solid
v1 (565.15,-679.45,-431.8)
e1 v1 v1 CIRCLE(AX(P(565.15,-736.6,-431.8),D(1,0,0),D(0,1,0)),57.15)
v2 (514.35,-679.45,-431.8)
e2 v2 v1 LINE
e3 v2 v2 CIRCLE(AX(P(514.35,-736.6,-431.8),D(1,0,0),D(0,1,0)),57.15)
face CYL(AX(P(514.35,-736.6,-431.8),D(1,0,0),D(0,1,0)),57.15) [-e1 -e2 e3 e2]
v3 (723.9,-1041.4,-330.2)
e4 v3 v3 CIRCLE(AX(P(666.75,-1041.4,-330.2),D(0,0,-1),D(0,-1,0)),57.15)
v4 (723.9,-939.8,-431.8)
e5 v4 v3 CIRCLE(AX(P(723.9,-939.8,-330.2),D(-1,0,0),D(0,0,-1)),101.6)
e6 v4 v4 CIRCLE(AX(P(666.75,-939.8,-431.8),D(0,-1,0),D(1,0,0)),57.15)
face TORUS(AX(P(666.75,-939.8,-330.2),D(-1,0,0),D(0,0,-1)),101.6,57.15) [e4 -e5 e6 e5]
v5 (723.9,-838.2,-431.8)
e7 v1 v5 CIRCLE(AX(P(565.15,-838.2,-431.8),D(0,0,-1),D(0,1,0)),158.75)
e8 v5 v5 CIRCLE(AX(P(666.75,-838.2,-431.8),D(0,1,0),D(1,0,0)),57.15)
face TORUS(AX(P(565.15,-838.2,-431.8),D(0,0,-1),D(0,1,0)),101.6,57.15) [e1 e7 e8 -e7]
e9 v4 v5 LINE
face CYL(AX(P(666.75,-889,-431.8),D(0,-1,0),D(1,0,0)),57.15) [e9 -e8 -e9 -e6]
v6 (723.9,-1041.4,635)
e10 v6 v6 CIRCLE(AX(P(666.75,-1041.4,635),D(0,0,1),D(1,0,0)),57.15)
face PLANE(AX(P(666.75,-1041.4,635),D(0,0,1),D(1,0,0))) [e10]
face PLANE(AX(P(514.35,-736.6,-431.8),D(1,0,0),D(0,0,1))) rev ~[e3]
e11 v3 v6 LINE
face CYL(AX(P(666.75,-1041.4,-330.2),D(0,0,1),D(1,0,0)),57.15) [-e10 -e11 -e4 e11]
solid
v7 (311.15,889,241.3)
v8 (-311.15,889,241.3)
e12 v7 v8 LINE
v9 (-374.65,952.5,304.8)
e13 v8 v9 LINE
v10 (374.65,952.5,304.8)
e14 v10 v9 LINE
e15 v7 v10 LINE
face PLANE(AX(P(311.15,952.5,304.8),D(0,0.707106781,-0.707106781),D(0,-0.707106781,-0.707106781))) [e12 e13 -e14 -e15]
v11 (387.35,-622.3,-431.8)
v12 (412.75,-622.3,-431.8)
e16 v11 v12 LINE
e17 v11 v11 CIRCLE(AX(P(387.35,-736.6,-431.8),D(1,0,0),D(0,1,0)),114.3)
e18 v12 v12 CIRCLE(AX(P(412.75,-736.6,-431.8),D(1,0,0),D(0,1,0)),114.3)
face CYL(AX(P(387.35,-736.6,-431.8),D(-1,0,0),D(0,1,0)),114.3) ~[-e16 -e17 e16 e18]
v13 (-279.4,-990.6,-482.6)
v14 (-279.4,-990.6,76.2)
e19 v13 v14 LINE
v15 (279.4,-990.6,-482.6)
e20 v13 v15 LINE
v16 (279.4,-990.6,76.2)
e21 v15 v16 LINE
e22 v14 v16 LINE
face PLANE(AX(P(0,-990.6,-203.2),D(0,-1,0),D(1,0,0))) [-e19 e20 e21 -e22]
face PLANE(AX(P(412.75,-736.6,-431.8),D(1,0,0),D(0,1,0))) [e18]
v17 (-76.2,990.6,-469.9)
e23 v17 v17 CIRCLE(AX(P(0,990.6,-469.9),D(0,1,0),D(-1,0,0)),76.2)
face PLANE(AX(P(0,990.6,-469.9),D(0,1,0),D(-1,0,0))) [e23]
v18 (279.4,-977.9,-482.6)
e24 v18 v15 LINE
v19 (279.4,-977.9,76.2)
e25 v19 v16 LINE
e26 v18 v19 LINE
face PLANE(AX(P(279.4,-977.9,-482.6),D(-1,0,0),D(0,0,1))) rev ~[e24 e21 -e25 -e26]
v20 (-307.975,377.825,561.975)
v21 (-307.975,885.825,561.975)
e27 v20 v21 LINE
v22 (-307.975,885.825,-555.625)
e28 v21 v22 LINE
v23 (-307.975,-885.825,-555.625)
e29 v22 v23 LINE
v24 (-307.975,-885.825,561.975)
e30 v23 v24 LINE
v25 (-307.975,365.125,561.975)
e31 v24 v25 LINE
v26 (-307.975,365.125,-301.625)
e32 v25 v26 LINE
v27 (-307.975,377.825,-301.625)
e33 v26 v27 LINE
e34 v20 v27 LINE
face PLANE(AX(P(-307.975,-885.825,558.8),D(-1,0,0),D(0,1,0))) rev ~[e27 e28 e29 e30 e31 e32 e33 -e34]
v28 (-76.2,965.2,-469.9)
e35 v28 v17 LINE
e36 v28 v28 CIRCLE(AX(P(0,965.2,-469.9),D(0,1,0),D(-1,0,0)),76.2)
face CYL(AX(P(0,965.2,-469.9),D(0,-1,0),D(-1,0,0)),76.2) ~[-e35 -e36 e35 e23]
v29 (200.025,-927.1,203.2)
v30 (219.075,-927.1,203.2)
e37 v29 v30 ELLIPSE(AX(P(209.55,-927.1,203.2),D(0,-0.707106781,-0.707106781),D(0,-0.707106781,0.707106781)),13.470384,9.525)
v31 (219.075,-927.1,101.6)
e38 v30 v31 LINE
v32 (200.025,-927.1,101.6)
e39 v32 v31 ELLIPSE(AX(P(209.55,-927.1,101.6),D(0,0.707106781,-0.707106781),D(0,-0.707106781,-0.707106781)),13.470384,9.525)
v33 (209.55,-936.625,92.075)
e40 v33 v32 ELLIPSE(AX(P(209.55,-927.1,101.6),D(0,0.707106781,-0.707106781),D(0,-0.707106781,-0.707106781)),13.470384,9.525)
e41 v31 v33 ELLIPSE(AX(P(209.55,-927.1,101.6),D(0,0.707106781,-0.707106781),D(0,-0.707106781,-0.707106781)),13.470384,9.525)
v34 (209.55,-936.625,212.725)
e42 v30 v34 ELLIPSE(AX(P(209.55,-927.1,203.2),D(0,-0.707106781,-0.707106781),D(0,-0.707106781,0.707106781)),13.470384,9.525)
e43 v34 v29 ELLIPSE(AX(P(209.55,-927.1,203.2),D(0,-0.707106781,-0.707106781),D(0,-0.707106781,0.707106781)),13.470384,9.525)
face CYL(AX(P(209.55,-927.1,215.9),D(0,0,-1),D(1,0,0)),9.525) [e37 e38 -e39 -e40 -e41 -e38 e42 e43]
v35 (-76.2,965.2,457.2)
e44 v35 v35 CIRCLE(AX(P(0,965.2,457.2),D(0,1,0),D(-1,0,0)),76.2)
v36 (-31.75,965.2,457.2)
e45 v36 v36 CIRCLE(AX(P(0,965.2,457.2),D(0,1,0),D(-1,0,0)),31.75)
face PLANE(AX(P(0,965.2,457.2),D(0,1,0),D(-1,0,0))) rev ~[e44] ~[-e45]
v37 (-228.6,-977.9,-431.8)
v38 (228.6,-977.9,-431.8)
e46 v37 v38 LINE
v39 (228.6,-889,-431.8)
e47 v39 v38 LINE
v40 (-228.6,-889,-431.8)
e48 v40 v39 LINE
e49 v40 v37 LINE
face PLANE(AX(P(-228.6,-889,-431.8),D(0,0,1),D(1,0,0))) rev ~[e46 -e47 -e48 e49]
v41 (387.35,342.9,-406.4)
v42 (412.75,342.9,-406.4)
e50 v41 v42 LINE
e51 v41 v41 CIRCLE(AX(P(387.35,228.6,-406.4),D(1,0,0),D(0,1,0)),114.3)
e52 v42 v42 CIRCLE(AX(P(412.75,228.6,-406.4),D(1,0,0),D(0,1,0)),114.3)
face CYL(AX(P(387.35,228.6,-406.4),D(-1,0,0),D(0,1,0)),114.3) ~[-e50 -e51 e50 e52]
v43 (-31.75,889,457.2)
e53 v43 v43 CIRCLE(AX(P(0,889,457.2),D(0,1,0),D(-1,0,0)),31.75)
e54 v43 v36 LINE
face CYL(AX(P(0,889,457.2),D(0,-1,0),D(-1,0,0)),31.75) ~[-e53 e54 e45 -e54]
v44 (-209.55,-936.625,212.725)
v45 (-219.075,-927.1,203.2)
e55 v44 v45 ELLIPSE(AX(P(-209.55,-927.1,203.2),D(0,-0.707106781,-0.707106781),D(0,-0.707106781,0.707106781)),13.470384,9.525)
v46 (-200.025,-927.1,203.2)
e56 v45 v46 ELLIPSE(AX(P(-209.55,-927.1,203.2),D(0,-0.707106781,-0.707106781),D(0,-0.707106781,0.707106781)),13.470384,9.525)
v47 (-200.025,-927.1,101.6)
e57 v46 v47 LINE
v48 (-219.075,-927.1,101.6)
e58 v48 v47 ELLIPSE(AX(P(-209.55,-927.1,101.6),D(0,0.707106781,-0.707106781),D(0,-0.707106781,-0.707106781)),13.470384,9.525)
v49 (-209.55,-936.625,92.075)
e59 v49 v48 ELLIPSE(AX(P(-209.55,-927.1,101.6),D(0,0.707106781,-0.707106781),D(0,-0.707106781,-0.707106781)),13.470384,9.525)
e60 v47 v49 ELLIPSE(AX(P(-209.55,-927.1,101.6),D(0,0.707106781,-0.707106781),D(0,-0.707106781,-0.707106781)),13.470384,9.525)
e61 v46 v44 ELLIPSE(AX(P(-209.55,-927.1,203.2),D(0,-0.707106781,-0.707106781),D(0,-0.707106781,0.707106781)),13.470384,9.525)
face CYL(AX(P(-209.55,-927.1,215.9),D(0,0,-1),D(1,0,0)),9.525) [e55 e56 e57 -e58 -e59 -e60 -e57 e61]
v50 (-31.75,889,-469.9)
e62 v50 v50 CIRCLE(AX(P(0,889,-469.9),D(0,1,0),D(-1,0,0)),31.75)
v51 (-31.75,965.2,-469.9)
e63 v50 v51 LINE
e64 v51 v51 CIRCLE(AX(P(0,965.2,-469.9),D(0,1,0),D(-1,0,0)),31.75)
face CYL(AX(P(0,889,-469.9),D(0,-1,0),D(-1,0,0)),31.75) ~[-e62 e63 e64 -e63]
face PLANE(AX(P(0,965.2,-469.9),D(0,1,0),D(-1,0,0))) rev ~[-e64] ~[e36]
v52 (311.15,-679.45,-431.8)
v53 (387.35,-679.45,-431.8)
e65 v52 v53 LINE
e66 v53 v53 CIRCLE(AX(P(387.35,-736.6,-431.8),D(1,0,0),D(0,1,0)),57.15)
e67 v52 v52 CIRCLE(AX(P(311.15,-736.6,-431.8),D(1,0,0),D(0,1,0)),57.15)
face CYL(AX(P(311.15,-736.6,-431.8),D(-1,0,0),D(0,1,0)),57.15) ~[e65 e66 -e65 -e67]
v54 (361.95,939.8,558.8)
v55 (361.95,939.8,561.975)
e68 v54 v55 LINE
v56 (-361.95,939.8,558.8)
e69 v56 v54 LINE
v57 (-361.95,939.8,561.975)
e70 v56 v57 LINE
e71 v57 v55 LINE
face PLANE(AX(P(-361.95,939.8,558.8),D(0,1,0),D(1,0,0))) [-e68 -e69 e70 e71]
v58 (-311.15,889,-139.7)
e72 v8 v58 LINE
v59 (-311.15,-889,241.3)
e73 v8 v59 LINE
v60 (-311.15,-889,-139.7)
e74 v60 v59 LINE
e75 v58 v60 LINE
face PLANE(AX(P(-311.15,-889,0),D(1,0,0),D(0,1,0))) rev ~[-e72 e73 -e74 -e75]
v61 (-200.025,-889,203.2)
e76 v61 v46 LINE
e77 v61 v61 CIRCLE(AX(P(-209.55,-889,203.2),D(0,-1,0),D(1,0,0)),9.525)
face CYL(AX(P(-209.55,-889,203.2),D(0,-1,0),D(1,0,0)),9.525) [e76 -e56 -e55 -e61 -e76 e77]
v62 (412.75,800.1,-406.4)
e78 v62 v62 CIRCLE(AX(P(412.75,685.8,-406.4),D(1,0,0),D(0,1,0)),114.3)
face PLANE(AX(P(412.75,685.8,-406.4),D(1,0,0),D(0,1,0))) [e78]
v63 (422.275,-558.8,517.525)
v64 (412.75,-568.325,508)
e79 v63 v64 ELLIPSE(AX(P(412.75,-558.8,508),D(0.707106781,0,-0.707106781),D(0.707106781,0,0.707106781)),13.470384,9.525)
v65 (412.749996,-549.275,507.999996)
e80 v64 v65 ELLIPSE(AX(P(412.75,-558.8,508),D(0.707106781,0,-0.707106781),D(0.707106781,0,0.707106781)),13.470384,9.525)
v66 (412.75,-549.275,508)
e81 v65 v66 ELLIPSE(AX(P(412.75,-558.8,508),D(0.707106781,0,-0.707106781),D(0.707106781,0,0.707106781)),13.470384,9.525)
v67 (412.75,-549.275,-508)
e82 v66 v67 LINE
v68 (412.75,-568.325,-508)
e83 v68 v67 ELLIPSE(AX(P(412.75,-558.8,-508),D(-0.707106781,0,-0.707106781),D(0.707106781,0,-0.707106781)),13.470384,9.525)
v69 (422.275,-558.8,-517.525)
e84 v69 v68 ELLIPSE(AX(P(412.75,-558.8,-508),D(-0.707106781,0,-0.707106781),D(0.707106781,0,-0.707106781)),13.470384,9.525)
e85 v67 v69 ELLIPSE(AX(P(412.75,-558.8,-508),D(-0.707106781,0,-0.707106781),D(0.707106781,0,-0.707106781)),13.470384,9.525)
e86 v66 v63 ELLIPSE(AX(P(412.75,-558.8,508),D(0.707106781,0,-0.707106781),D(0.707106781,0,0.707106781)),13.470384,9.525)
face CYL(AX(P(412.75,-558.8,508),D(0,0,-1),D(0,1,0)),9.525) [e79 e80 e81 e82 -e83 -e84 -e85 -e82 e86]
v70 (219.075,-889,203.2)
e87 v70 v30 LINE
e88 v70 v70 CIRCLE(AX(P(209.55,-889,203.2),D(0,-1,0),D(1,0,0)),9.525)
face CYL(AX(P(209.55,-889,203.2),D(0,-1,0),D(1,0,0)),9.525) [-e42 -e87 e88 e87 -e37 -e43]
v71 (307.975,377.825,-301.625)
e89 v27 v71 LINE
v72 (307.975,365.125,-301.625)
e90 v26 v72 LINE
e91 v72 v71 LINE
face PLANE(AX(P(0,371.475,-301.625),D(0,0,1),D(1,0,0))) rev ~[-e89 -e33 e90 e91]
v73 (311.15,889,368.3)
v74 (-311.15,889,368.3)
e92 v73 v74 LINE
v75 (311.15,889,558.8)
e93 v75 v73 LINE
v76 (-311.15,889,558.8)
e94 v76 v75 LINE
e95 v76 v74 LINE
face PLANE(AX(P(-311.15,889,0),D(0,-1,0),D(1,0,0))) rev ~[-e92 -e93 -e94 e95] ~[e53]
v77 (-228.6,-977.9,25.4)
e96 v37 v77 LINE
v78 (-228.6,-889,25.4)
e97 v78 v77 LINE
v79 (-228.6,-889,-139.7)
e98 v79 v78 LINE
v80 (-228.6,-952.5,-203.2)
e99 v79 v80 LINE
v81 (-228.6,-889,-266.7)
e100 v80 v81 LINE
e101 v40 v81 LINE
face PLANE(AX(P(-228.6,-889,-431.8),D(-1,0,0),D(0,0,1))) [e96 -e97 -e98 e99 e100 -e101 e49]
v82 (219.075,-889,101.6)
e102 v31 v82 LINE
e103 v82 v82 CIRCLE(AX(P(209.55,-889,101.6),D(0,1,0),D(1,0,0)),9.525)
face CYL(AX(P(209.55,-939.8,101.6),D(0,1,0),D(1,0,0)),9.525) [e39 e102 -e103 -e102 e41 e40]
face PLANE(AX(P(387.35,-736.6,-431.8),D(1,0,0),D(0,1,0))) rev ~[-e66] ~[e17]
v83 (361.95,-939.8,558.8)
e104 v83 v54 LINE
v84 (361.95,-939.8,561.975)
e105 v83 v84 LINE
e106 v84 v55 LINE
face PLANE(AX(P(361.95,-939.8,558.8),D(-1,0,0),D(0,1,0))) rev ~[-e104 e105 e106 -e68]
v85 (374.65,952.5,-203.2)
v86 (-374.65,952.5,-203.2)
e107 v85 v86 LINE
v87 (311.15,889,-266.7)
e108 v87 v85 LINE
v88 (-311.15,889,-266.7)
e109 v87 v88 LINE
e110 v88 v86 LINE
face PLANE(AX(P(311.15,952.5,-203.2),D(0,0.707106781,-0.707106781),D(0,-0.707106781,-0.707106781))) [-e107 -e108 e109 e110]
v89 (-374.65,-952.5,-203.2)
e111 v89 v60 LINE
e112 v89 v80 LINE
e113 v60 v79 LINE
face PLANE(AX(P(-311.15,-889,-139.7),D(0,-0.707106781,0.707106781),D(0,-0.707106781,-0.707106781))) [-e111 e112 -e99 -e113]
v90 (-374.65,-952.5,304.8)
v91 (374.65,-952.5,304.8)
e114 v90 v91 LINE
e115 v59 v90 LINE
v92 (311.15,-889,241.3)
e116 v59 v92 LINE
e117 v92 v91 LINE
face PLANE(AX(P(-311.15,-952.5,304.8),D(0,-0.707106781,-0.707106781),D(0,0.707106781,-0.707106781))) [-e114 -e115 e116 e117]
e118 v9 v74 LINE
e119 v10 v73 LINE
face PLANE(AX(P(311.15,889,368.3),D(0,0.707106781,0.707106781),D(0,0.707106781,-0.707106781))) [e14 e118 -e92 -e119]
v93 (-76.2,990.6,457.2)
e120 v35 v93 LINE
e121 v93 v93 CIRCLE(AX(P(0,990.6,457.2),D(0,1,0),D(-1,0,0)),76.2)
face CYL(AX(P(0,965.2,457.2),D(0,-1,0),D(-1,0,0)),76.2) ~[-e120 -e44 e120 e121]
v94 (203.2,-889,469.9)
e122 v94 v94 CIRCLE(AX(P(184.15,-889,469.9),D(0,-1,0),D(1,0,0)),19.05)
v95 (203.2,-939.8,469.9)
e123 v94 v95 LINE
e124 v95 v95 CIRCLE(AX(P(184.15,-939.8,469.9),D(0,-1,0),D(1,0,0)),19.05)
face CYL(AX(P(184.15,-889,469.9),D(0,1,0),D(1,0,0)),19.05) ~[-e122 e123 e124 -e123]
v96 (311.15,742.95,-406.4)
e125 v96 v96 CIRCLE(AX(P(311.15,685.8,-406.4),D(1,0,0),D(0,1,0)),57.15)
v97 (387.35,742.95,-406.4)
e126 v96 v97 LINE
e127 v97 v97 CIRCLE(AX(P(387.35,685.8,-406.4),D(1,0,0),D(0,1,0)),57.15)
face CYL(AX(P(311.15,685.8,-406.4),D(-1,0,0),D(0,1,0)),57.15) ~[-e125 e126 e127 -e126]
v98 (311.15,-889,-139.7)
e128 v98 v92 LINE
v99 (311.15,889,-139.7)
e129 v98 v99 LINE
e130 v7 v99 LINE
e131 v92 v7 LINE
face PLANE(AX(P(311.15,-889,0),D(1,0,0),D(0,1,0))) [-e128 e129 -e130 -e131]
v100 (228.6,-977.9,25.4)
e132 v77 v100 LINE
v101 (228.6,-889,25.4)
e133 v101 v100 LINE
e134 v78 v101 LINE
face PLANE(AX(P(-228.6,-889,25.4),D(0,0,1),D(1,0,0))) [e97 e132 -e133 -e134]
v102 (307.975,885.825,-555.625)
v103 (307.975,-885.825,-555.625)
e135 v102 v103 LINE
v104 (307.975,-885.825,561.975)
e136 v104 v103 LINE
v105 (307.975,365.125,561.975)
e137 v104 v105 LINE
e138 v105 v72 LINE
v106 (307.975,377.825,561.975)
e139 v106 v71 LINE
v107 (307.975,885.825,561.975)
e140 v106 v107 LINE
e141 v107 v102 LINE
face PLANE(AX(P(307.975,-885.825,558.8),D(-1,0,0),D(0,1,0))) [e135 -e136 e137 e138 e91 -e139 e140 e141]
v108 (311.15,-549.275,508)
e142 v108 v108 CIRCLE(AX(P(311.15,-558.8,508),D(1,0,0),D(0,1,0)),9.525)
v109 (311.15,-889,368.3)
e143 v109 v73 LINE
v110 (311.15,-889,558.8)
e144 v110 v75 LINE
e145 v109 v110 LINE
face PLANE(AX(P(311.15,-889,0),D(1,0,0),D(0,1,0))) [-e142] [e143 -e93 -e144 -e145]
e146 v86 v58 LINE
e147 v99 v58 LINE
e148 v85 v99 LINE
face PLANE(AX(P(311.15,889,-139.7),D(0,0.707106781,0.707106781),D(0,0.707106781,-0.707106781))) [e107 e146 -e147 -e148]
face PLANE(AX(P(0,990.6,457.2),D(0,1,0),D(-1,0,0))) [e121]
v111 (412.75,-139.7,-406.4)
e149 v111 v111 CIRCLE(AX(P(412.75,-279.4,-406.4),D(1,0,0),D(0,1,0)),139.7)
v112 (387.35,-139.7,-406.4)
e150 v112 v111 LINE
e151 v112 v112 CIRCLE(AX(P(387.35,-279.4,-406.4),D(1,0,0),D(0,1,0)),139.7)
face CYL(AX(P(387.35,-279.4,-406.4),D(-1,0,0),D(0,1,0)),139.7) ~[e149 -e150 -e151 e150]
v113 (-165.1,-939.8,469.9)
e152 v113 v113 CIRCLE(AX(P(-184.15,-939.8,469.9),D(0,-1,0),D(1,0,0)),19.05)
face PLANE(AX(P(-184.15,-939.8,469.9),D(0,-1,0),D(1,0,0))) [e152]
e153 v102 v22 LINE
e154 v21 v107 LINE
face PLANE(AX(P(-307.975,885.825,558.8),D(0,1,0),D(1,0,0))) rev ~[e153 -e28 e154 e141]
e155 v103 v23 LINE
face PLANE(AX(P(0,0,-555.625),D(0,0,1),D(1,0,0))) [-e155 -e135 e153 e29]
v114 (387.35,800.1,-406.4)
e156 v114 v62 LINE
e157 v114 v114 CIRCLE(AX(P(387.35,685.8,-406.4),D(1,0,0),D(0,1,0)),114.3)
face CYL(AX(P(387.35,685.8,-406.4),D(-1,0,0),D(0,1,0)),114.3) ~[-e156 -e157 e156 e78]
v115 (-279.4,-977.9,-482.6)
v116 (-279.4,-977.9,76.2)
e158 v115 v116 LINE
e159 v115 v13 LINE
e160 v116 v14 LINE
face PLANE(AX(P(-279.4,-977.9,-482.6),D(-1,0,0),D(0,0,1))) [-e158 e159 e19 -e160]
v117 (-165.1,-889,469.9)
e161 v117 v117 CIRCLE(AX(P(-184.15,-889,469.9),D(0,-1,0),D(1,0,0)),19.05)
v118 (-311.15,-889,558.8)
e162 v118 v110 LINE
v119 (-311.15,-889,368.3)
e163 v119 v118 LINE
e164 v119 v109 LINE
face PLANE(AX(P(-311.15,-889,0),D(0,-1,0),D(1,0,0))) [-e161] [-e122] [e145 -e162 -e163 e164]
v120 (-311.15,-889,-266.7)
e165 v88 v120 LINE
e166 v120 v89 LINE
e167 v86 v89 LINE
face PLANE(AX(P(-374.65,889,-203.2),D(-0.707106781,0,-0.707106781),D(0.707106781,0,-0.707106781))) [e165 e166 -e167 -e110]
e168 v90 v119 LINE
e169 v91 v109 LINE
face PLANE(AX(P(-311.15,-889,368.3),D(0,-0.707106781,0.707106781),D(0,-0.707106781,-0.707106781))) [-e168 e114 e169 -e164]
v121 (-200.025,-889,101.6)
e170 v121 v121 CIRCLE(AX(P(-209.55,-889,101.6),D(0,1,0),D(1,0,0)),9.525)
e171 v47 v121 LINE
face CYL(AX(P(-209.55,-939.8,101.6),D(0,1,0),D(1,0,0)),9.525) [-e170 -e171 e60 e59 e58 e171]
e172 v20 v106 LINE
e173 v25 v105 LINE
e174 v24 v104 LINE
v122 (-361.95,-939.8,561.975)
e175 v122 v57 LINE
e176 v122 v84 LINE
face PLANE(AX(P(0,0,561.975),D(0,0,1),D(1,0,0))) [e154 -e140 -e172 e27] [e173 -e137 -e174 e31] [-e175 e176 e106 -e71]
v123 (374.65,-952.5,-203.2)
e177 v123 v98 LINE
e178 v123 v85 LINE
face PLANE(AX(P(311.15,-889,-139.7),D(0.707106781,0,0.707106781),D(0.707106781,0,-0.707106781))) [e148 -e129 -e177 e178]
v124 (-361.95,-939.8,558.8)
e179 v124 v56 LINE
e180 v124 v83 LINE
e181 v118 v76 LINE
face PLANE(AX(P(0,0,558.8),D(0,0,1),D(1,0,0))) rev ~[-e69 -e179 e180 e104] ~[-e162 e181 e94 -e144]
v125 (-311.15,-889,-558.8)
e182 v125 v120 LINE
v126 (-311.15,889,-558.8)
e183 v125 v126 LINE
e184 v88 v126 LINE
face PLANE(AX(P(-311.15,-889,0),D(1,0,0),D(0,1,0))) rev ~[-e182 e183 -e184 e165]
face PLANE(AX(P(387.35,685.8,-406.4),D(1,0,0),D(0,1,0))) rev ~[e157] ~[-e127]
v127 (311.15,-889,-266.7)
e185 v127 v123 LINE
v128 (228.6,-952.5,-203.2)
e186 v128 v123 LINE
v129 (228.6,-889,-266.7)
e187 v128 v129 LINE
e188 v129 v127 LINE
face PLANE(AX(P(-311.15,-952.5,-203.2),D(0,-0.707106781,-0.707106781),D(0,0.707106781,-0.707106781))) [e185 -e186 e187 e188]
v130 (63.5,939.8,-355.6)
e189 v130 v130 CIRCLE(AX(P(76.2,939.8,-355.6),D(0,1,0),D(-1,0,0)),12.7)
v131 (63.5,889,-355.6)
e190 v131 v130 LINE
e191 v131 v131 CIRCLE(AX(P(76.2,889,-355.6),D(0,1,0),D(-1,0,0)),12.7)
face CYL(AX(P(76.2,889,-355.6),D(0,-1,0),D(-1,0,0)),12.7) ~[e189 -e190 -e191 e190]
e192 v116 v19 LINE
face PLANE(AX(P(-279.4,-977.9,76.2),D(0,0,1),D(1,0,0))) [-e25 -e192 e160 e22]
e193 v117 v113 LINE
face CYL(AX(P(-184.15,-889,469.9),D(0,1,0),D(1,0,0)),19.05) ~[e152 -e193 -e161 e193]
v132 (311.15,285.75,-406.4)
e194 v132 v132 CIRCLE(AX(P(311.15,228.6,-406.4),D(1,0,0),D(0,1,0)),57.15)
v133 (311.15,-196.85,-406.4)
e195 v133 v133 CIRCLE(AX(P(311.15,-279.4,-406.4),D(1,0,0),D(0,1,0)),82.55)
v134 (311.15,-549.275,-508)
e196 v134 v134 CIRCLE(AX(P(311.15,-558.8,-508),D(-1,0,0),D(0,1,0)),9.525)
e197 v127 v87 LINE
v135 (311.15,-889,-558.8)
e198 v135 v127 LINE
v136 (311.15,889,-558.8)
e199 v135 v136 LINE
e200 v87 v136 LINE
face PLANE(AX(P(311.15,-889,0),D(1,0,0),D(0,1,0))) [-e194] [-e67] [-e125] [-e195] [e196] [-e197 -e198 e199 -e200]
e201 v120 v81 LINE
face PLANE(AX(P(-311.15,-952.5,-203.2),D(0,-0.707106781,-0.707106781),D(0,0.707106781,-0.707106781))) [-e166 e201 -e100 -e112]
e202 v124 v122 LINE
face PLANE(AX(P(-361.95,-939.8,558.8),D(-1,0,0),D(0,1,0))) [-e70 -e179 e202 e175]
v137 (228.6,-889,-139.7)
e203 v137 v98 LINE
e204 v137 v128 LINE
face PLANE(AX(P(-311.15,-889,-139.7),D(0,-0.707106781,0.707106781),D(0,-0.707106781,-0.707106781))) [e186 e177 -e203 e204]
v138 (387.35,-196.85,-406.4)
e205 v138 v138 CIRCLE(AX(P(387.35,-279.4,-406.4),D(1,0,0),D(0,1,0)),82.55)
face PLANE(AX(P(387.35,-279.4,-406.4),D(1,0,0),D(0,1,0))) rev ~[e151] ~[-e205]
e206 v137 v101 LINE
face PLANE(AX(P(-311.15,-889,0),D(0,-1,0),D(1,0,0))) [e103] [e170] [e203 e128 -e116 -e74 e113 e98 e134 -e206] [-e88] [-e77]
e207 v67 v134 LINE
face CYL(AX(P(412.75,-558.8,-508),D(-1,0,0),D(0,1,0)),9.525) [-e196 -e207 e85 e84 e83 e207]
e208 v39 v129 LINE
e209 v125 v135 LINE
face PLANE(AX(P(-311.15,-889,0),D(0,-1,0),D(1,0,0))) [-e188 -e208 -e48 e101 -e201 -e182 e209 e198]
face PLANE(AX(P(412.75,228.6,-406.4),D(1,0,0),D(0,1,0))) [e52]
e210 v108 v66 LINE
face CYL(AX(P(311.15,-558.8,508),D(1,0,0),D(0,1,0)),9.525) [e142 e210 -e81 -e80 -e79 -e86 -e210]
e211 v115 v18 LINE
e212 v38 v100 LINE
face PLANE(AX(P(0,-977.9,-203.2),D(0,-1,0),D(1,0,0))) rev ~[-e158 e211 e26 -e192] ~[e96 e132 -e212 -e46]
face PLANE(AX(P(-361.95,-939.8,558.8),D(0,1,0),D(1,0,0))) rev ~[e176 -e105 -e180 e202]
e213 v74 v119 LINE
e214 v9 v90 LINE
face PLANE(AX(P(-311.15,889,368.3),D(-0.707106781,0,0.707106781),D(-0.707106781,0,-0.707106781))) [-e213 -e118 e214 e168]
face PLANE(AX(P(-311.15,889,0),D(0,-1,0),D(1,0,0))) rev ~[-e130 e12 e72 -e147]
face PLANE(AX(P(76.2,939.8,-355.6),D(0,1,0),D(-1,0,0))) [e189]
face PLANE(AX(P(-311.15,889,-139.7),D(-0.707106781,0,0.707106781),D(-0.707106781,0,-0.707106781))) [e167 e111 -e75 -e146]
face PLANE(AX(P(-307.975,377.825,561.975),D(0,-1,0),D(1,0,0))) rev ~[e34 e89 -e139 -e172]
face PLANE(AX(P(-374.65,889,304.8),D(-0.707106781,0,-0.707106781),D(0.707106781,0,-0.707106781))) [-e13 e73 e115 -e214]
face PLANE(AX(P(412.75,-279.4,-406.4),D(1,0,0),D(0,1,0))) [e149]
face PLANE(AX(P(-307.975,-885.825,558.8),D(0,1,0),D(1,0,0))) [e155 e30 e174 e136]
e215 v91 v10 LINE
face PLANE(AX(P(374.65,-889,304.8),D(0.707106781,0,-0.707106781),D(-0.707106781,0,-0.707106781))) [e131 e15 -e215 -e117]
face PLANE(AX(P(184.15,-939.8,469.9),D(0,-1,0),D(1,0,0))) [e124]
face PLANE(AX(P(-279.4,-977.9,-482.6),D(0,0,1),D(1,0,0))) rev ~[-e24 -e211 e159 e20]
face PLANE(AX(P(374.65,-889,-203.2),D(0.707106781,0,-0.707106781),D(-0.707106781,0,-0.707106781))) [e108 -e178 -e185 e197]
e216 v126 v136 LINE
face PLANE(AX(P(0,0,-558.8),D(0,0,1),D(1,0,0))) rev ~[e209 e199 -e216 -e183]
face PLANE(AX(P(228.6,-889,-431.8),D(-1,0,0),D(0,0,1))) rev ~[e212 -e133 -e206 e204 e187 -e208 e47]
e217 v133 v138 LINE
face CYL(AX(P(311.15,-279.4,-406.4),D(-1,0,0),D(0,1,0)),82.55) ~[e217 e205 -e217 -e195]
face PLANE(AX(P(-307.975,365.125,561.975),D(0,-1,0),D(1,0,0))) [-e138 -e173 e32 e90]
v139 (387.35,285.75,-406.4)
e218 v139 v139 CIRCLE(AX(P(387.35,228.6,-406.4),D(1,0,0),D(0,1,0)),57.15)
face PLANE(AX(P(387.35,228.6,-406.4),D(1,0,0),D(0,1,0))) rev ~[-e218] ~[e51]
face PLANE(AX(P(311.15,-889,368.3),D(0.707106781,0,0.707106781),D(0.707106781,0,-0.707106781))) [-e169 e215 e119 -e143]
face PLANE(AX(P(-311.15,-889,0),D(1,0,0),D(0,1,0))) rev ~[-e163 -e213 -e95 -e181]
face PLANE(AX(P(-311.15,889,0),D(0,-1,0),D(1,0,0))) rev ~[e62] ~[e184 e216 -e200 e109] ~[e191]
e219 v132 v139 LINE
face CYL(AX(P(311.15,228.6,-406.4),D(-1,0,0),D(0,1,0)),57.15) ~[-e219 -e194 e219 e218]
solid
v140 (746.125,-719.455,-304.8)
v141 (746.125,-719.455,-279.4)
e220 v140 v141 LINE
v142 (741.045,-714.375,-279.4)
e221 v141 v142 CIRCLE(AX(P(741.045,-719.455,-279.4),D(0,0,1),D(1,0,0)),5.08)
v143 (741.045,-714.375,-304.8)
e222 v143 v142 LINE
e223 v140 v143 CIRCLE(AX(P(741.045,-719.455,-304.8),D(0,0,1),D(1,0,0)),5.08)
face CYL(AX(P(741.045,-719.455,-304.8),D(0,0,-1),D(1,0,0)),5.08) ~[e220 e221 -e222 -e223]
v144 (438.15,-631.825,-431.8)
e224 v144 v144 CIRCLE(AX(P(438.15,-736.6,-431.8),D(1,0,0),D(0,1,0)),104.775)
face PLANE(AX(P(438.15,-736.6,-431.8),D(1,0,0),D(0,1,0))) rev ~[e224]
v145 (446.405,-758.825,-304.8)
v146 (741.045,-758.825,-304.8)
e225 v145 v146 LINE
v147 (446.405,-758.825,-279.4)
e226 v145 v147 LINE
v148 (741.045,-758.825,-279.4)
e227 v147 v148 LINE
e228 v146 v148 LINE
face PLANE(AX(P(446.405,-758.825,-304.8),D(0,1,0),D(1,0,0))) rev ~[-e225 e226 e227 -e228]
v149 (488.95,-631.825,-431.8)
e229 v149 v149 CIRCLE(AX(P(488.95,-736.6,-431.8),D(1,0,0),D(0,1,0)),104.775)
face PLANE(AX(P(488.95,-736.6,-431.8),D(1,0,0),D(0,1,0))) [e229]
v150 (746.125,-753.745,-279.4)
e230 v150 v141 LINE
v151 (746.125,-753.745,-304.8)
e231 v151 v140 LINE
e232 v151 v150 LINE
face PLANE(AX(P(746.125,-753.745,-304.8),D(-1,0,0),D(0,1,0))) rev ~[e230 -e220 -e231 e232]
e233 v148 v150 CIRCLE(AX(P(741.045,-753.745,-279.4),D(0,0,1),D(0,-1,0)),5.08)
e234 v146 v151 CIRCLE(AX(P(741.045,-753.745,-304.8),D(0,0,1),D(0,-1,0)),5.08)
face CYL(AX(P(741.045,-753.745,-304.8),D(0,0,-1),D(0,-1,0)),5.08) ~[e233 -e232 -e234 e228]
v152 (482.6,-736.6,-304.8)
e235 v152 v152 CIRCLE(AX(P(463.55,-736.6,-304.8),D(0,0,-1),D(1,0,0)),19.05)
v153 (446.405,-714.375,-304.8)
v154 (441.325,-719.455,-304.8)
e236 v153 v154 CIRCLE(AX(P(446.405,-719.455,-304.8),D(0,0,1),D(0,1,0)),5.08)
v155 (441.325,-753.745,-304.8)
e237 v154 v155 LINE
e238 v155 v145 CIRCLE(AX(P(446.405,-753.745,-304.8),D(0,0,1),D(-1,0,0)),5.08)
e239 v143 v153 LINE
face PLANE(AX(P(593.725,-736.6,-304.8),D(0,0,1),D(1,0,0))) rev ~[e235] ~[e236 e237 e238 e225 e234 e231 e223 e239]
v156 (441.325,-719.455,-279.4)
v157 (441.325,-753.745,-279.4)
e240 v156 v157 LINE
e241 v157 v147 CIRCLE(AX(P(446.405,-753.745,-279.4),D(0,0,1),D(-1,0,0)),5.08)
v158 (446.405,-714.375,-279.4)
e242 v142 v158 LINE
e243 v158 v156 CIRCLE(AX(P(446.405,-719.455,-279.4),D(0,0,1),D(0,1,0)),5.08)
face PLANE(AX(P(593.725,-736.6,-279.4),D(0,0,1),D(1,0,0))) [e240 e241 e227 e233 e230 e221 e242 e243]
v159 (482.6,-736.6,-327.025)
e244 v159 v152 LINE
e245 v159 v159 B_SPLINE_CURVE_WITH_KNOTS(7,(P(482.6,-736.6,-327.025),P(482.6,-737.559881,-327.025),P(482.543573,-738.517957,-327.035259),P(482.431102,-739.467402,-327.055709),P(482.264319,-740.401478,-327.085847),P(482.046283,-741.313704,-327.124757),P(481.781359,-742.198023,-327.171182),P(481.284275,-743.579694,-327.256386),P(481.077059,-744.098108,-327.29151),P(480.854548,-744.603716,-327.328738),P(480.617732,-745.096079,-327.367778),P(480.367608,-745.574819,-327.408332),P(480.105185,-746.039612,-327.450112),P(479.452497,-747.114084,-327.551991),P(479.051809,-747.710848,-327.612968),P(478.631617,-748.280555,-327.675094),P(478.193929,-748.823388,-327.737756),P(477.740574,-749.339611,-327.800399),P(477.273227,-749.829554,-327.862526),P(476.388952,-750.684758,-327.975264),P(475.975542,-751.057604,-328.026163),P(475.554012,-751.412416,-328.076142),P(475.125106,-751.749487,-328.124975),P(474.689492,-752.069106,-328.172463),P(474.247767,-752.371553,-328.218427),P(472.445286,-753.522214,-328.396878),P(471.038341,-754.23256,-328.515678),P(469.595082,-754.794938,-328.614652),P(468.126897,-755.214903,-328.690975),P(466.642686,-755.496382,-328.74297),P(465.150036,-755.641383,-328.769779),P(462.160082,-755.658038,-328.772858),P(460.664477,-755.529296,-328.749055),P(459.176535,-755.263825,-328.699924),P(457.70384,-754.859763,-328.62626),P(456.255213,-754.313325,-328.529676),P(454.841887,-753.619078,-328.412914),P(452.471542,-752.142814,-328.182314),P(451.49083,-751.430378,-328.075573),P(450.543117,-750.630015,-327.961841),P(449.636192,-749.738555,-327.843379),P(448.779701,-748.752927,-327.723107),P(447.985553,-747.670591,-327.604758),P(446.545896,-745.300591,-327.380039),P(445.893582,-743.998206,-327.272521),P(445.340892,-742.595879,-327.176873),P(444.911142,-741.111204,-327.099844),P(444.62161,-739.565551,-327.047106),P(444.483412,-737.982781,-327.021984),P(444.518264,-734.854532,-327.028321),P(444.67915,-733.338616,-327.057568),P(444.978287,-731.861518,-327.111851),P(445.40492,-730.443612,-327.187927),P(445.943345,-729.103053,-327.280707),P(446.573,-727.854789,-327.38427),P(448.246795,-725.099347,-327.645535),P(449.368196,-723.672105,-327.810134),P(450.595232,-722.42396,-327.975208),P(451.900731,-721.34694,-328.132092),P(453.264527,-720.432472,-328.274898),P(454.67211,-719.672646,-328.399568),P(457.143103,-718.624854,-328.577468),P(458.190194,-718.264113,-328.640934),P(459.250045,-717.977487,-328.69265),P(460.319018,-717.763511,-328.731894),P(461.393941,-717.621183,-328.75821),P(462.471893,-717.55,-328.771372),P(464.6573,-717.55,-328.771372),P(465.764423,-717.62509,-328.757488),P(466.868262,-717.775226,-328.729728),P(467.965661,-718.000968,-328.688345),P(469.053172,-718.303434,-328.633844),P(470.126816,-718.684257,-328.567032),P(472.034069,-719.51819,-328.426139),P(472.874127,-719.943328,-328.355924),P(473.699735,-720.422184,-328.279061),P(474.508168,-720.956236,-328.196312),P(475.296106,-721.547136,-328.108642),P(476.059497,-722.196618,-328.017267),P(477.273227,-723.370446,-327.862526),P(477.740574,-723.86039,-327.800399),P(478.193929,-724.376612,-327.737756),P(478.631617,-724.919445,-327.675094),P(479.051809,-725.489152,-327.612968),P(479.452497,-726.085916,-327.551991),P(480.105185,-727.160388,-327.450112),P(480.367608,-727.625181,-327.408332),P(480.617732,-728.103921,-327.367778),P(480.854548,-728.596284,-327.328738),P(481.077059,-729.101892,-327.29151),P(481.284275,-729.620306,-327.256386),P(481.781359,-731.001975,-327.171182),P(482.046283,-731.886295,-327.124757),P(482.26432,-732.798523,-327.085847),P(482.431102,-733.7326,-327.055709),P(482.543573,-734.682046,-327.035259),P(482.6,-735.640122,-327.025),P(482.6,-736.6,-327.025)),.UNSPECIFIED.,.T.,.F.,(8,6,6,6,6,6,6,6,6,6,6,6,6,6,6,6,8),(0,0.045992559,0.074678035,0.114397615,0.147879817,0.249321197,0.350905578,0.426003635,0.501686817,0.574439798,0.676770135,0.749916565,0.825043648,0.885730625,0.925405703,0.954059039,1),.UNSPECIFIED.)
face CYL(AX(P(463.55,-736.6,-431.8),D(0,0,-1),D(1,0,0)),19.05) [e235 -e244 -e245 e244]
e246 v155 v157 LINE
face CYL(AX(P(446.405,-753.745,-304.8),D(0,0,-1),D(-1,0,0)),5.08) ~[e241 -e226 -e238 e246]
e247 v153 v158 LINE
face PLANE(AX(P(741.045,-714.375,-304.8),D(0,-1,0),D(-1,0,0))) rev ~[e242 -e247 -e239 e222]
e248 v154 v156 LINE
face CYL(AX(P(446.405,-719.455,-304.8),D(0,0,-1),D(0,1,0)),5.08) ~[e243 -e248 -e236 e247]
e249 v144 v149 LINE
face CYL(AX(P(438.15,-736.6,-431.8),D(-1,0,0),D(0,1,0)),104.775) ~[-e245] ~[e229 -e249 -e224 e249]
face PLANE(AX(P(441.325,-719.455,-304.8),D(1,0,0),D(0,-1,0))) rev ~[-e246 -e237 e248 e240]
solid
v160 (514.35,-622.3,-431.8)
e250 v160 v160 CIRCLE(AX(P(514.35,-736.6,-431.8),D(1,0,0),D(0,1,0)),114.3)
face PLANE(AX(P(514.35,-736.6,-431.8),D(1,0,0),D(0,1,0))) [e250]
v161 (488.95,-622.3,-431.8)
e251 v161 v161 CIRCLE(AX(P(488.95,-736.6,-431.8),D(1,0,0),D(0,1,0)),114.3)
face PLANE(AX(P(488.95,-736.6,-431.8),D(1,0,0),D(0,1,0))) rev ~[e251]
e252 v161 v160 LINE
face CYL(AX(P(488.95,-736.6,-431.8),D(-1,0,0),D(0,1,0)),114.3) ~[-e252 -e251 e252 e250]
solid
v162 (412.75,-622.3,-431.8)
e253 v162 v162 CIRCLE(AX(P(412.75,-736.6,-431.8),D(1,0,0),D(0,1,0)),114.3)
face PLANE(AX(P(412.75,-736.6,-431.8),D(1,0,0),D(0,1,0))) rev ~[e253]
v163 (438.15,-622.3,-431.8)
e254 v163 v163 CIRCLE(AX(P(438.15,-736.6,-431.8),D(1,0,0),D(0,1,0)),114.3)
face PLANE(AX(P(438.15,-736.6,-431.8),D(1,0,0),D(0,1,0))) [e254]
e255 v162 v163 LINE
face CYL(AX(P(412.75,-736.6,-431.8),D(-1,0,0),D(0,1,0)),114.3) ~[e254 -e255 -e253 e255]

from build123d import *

# Parameters (mm, degrees)
F0_W          = 622.3
F0_H          = 1778
F1_DEPTH      = 558.8
F1_DEPTH_BACK = 558.8
F2_T          = -3.175
F3_W          = 723.9
F3_H          = 1879.6
F3_W_2        = 615.95
F3_H_2        = 1771.65
F4_DEPTH      = 3.175
F7_W          = 457.2
F7_H          = 457.2
F8_DEPTH      = 88.9
F9_W          = 558.8
F9_H          = 558.8
F9_W_2        = 457.2
F9_H_2        = 457.2
F10_DEPTH     = 12.7
F11_R         = 82.55
F11_R_2       = 57.15
F12_DEPTH     = 76.2
F13_R         = 139.7
F13_R_2       = 114.3
F14_DEPTH     = 25.4
F15_R         = 9.525
F18_W         = 615.95
F18_H         = 12.7
F19_DEPTH     = 863.6
F20_R         = 31.75
F21_DEPTH     = 76.2
F22_R         = 12.7
F23_DEPTH     = 50.8
F24_R         = 57.15
F25_DEPTH     = 76.2
F26_R         = 114.3
F27_DEPTH     = 25.4
F28_R         = 114.3
F29_DEPTH     = 25.4
F30_R         = 104.775
F31_DEPTH     = 50.8
F32_R         = 114.3
F33_DEPTH     = 25.4
F34_R         = 57.15
F36_FACE_R    = 57.15
F40_R         = 19.05
F41_DEPTH     = 127
F43_DEPTH     = 25.4
F44_R         = 76.2
F45_DEPTH     = 25.4
F46_R         = 19.05
F47_DEPTH     = 50.8
F48_R         = 9.525


with BuildPart() as f1:
    # F0 (on Top) → F1 (new body, two sides)
    with BuildSketch(Plane.XY) as f1_sk:
        Rectangle(F0_W, F0_H)
    extrude(amount=F1_DEPTH)
    extrude(f1_sk.sketch, amount=-F1_DEPTH_BACK)

    # F2
    f2_openings = [f1.faces().sort_by_distance(p)[0] for p in [
        (0, 0, 558.8),
    ]]
    offset(amount=F2_T, openings=f2_openings)

    # F3 (on face) → F4 (join)
    with BuildSketch(Plane.XY.offset(558.8)):
        Rectangle(F3_W, F3_H)
        Rectangle(F3_W_2, F3_H_2, mode=Mode.SUBTRACT)
    extrude(amount=F4_DEPTH)

    # F6: sweep along a path in F6_path
    with BuildLine(Plane(origin=(-311.15, -889, -558.8), x_dir=(0, -1, 0), z_dir=(0, 0, -1))) as f6_path:
        Line((0, 0), (0, -622.3))
        Line((0, -622.3), (-1778, -622.3))
        Line((-1778, -622.3), (-1778, 0))
        Line((-1778, 0), (0, 0))
    # F5 (on face) → F6 (sweep)
    with BuildSketch(Plane.YZ.offset(311.15)):
        Polygon((-889, 241.3), (-889, 368.3), (-952.5, 304.8), align=None)
        Polygon((-889, -266.7), (-889, -139.7), (-952.5, -203.2), align=None)
    sweep(path=f6_path.line, transition=Transition.RIGHT)

    # F7 (on face) → F8 (join)
    with BuildSketch(Plane.XZ.offset(889)):
        with Locations((0, -203.2)):
            Rectangle(F7_W, F7_H)
    extrude(amount=F8_DEPTH)

    # F9 (on face) → F10 (join)
    with BuildSketch(Plane.XZ.offset(977.9)):
        with Locations((0, -203.2)):
            Rectangle(F9_W, F9_H)
        with Locations((0, -203.2)):
            Rectangle(F9_W_2, F9_H_2, mode=Mode.SUBTRACT)
        with Locations((0, -203.2)):
            Rectangle(F9_W_2, F9_H_2)
    extrude(amount=F10_DEPTH)

    # F11 (on face) → F12 (join)
    with BuildSketch(Plane.YZ.offset(311.15)):
        with Locations((-279.4, -406.4)):
            Circle(F11_R)
        with Locations((228.6, -406.4)):
            Circle(F11_R_2)
        with Locations((685.8, -406.4)):
            Circle(F11_R_2)
    extrude(amount=F12_DEPTH)

    # F13 (on face) → F14 (join)
    with BuildSketch(Plane.YZ.offset(387.35)):
        with Locations((-279.4, -406.4)):
            Circle(F13_R)
        with Locations((228.6, -406.4)):
            Circle(F13_R_2)
        with Locations((685.8, -406.4)):
            Circle(F13_R_2)
    extrude(amount=F14_DEPTH)

    # F17: sweep along a path in F16
    with BuildLine(Plane.XZ.offset(889)) as f17_path:
        Line((311.15, 508), (412.75, 508))
        Line((412.75, 508), (412.75, -508))
        Line((412.75, -508), (311.15, -508))
    # F15 (on face) → F17 (sweep)
    with BuildSketch(Plane.YZ.offset(311.15)):
        with Locations((-558.8, 508)):
            Circle(F15_R)
    sweep(path=f17_path.line, transition=Transition.RIGHT)

    # F18 (on face) → F19 (join)
    with BuildSketch(Plane.XY.offset(561.975)):
        with Locations((0, 371.475)):
            Rectangle(F18_W, F18_H)
    extrude(amount=-F19_DEPTH)

    # F20 (on face) → F21 (join)
    with BuildSketch(Plane(origin=(0, 889, 0), x_dir=(-1, 0, 0), z_dir=(0, 1, 0))):
        with Locations((0, 457.2)):
            Circle(F20_R)
        with Locations((0, -469.9)):
            Circle(F20_R)
    extrude(amount=F21_DEPTH)

    # F22 (on face) → F23 (join)
    with BuildSketch(Plane(origin=(0, 889, 0), x_dir=(-1, 0, 0), z_dir=(0, 1, 0))):
        with Locations((-76.2, -355.6)):
            Circle(F22_R)
    extrude(amount=F23_DEPTH)

    # F24 (on face) → F25 (join)
    with BuildSketch(Plane.YZ.offset(311.15)):
        with Locations((-736.6, -431.8)):
            Circle(F24_R)
    extrude(amount=F25_DEPTH)

    # F26 (on face) → F27 (join)
    with BuildSketch(Plane.YZ.offset(387.35)):
        with Locations((-736.6, -431.8)):
            Circle(F26_R)
    extrude(amount=F27_DEPTH)

    # F44 (on face) → F45 (join)
    with BuildSketch(Plane(origin=(0, 965.2, 0), x_dir=(-1, 0, 0), z_dir=(0, 1, 0))):
        with Locations((0, 457.2)):
            Circle(F44_R)
        with Locations((0, -469.9)):
            Circle(F44_R)
    extrude(amount=F45_DEPTH)

    # F46 (on face) → F47 (join)
    with BuildSketch(Plane.XZ.offset(889)):
        with Locations((-184.15, 469.9)):
            Circle(F46_R)
        with Locations((184.15, 469.9)):
            Circle(F46_R)
    extrude(amount=F47_DEPTH)

    # F50: sweep along a path in F49
    with BuildLine(Plane.YZ.offset(311.15)) as f50_path:
        Line((-889, 215.9), (-939.8, 215.9))
        Line((-939.8, 215.9), (-939.8, 88.9))
        Line((-939.8, 88.9), (-889, 88.9))
    # F48 (on face) → F50 (sweep)
    with BuildSketch(Plane.XZ.offset(889)):
        with Locations((-209.55, 203.2)):
            Circle(F48_R)
        with Locations((209.55, 203.2)):
            Circle(F48_R)
    sweep(path=f50_path.line, transition=Transition.RIGHT)


with BuildPart() as f29:
    # F28 (on face) → F29 (new body)
    with BuildSketch(Plane.YZ.offset(412.75)):
        with Locations((-736.6, -431.8)):
            Circle(F28_R)
    extrude(amount=F29_DEPTH)


with BuildPart() as f31:
    # F30 (on face) → F31 (new body)
    with BuildSketch(Plane.YZ.offset(438.15)):
        with Locations((-736.6, -431.8)):
            Circle(F30_R)
    extrude(amount=F31_DEPTH)

    # F40 (on plane+point) → F41 (join)
    with BuildSketch(Plane(origin=(0, 0, -431.8), x_dir=(1, 0, 0), z_dir=(0, 0, -1))):
        with Locations((463.55, 736.6)):
            Circle(F40_R)
    extrude(amount=-F41_DEPTH)

    # F42 (on face) → F43 (join)
    with BuildSketch(Plane.XY.offset(-304.8)):
        with BuildLine():
            Line((741.045, -714.375), (446.405, -714.375))
            ThreePointArc((446.405, -714.375), (442.8128975516, -715.8628975516), (441.325, -719.455))
            Line((441.325, -719.455), (441.325, -753.745))
            ThreePointArc((441.325, -753.745), (442.8128975516, -757.3371024484), (446.405, -758.825))
            Line((446.405, -758.825), (741.045, -758.825))
            ThreePointArc((741.045, -758.825), (744.6371024484, -757.3371024484), (746.125, -753.745))
            Line((746.125, -753.745), (746.125, -719.455))
            ThreePointArc((746.125, -719.455), (744.6371024484, -715.8628975516), (741.045, -714.375))
        make_face()
    extrude(amount=F43_DEPTH)


with BuildPart() as f33:
    # F32 (on face) → F33 (new body)
    with BuildSketch(Plane.YZ.offset(488.95)):
        with Locations((-736.6, -431.8)):
            Circle(F32_R)
    extrude(amount=F33_DEPTH)


with BuildPart() as f36:
    # F36: sweep along a path in F35
    with BuildLine(Plane(origin=(0, 0, -558.8), x_dir=(1, 0, 0), z_dir=(0, 0, -1))) as f36_path:
        Line((514.35, 736.6), (565.15, 736.6))
        ThreePointArc((565.15, 736.6), (636.9920489686, 766.3579510314), (666.75, 838.2))
        Line((666.75, 838.2), (666.75, 889))
    # F34 (on face) → F36 (sweep)
    with BuildSketch(Plane.YZ.offset(514.35)):
        with Locations((-736.6, -431.8)):
            Circle(F34_R)
    sweep(path=f36_path.line)

    # F38: sweep along a path in F37
    with BuildLine(Plane.YZ.offset(311.15)) as f38_path:
        Line((-889, -431.8), (-939.8, -431.8))
        ThreePointArc((-939.8, -431.8), (-1011.6420489686, -402.0420489686), (-1041.4, -330.2))
        Line((-1041.4, -330.2), (-1041.4, 635))
    # F36_face (on face) → F38 (sweep)
    with BuildSketch(Plane(origin=(666.75, -889, -431.8), x_dir=(1, 0, 0), z_dir=(0, -1, 0))):
        Circle(F36_FACE_R)
    sweep(path=f38_path.line)


solid = Compound([f1.part, f29.part, f31.part, f33.part, f36.part])
